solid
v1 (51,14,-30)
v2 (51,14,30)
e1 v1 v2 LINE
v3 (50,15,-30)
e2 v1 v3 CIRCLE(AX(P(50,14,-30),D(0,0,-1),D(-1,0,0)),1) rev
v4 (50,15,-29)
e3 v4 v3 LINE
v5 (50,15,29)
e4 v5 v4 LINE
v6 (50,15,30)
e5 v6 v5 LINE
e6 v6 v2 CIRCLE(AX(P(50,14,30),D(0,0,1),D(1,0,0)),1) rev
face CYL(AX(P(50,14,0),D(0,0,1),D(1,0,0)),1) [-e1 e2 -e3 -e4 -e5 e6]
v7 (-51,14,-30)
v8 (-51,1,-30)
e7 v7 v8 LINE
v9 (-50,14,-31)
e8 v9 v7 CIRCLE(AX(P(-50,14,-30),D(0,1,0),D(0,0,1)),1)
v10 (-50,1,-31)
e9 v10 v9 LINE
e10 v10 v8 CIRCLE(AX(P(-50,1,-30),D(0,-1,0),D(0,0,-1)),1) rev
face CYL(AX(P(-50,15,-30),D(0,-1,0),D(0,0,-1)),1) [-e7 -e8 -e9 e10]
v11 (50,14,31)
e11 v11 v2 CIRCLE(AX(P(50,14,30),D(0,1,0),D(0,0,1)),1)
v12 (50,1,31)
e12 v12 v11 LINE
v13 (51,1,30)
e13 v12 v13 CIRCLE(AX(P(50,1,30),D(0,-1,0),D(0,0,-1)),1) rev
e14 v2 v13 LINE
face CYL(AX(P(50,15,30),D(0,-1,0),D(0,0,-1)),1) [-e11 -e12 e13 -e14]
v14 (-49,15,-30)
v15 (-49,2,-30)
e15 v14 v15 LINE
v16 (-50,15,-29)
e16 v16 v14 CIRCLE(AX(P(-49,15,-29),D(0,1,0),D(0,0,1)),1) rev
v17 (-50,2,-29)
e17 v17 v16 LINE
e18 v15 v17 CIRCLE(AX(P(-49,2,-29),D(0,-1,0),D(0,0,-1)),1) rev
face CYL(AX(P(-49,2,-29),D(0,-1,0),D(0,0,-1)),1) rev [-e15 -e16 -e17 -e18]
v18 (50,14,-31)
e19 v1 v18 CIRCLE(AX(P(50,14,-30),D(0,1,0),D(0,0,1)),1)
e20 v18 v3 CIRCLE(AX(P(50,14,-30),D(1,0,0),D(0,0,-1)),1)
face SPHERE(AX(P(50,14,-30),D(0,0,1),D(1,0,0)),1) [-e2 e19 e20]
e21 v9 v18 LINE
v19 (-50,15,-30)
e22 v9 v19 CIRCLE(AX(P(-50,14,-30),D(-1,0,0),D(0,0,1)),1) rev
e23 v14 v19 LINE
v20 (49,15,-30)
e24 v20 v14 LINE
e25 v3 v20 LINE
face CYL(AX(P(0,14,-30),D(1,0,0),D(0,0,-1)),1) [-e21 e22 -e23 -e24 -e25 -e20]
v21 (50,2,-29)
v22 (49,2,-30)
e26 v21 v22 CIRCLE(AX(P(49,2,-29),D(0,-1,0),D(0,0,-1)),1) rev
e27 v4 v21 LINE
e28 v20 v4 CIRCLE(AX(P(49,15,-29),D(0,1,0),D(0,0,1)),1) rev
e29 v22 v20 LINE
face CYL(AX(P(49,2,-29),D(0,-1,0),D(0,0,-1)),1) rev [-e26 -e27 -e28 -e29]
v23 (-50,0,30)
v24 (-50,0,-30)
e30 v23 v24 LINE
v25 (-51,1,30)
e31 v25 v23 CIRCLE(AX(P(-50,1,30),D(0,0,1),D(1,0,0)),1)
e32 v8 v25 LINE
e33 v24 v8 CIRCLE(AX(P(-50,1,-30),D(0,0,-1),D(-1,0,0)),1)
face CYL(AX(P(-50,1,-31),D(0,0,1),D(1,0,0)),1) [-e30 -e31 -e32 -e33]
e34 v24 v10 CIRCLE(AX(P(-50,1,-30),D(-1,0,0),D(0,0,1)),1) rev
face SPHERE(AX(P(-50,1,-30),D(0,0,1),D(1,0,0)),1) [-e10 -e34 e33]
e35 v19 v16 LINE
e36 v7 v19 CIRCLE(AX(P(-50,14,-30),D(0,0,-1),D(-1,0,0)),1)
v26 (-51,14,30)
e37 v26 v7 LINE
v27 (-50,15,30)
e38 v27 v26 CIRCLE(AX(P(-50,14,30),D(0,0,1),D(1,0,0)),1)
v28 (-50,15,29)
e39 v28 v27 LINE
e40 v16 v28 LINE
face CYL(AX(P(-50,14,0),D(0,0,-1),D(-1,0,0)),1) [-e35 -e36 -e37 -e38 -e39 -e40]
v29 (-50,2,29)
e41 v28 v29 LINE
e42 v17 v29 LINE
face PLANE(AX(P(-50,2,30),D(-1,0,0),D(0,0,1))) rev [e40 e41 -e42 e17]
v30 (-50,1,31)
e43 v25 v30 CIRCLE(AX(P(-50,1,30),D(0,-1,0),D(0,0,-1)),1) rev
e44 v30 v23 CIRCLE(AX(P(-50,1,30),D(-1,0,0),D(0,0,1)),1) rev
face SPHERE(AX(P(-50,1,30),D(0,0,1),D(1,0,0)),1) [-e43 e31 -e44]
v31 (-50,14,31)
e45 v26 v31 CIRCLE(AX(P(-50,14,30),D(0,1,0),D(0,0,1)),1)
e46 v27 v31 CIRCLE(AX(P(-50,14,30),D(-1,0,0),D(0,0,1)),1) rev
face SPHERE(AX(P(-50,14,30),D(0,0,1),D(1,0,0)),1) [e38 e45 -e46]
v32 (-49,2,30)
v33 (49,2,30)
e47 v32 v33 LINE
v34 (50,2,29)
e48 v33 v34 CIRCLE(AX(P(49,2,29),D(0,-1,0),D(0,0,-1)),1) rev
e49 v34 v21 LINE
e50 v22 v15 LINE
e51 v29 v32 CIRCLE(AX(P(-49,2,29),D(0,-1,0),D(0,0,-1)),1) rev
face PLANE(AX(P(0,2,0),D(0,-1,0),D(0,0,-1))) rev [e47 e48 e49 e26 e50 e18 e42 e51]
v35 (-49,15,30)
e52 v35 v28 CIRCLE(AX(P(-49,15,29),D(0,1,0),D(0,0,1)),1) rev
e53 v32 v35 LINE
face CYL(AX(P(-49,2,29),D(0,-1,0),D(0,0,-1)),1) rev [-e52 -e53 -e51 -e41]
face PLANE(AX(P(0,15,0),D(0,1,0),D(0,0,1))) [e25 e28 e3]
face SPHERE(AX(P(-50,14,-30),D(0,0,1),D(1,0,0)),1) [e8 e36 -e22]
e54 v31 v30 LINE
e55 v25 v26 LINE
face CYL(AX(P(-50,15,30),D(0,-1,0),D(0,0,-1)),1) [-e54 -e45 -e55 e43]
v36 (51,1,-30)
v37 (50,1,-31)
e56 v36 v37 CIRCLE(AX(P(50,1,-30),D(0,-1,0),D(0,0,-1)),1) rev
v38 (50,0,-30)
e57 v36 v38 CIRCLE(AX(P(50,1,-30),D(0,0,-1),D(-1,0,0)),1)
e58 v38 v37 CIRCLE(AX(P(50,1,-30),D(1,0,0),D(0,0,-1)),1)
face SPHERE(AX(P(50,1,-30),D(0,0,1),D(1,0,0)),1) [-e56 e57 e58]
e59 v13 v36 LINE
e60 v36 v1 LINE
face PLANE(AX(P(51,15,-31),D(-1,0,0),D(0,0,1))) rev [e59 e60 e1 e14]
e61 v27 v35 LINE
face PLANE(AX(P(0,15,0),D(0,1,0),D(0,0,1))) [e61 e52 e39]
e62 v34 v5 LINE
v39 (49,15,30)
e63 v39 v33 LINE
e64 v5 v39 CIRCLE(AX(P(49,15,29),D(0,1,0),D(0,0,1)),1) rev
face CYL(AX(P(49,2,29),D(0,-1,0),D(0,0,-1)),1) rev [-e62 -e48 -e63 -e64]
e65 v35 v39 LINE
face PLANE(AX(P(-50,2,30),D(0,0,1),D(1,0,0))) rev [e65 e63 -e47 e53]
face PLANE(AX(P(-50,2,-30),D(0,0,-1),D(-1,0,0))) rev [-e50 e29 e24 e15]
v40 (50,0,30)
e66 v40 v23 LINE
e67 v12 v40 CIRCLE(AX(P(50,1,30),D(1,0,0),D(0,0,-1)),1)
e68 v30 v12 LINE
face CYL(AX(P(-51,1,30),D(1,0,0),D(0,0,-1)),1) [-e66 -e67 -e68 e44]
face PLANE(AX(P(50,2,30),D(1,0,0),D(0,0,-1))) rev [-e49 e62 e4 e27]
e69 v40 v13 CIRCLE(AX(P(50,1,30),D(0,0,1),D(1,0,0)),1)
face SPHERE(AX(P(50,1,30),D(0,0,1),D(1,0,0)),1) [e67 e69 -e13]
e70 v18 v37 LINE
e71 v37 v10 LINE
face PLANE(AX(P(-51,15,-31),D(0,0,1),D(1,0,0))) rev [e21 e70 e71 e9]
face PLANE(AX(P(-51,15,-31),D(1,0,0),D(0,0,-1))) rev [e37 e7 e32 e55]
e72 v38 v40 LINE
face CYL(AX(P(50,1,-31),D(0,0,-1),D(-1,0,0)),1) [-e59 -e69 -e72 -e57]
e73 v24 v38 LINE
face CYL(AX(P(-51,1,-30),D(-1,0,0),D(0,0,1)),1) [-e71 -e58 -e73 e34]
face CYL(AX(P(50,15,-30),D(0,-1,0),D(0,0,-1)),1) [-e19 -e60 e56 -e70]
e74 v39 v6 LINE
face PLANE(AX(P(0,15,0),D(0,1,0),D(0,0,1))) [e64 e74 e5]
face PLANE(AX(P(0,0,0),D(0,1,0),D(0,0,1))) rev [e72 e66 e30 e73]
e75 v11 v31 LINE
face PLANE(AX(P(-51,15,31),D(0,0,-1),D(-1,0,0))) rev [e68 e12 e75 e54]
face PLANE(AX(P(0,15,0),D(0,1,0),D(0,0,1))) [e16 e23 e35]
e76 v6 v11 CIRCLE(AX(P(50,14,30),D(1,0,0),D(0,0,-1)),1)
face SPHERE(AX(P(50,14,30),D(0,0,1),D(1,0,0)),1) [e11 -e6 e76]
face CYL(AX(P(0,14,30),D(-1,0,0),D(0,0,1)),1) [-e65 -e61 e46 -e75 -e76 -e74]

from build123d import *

# Parameters (mm, degrees)
SKETCH1_W           = 102
SKETCH1_H           = 62
BOSS_EXTRUDE1_DEPTH = 15
SKETCH2_W           = 100
SKETCH2_H           = 60
CUT_EXTRUDE1_DEPTH  = 13
FILLET2_R           = 1
FILLET3_R           = 1


with BuildPart() as part:
    # Sketch1 → Boss-Extrude1 (new body)
    with BuildSketch(Plane(origin=(0, 0, 0), x_dir=(1, 0, 0), z_dir=(0, 1, 0))):
        Rectangle(SKETCH1_W, SKETCH1_H)
    extrude(amount=BOSS_EXTRUDE1_DEPTH)

    # Sketch2 → Cut-Extrude1 (cut)
    with BuildSketch(Plane(origin=(0, 15, 0), x_dir=(1, 0, 0), z_dir=(0, 1, 0))):
        Rectangle(SKETCH2_W, SKETCH2_H)
    extrude(amount=-CUT_EXTRUDE1_DEPTH, mode=Mode.SUBTRACT)

    # Fillet2
    fillet2_edges = [part.edges().sort_by_distance(p)[0] for p in [
        (50, 8.5, -30),
        (50, 8.5, 30),
        (-50, 8.5, 30),
        (-50, 8.5, -30),
    ]]
    fillet(fillet2_edges, radius=FILLET2_R)

    # Fillet3
    fillet3_edges = [part.edges().sort_by_distance(p)[0] for p in [
        (-51, 15, 0),
        (0, 15, 31),
        (51, 15, 0),
        (0, 0, 31),
        (-51, 0, 0),
        (0, 0, -31),
        (51, 0, 0),
        (51, 7.5, 31),
        (-51, 7.5, 31),
        (-51, 7.5, -31),
        (51, 7.5, -31),
        (0, 15, -31),
    ]]
    fillet(fillet3_edges, radius=FILLET3_R - 0.0001)  # a hair under: the kernel refuses the full size


solid = part.part
